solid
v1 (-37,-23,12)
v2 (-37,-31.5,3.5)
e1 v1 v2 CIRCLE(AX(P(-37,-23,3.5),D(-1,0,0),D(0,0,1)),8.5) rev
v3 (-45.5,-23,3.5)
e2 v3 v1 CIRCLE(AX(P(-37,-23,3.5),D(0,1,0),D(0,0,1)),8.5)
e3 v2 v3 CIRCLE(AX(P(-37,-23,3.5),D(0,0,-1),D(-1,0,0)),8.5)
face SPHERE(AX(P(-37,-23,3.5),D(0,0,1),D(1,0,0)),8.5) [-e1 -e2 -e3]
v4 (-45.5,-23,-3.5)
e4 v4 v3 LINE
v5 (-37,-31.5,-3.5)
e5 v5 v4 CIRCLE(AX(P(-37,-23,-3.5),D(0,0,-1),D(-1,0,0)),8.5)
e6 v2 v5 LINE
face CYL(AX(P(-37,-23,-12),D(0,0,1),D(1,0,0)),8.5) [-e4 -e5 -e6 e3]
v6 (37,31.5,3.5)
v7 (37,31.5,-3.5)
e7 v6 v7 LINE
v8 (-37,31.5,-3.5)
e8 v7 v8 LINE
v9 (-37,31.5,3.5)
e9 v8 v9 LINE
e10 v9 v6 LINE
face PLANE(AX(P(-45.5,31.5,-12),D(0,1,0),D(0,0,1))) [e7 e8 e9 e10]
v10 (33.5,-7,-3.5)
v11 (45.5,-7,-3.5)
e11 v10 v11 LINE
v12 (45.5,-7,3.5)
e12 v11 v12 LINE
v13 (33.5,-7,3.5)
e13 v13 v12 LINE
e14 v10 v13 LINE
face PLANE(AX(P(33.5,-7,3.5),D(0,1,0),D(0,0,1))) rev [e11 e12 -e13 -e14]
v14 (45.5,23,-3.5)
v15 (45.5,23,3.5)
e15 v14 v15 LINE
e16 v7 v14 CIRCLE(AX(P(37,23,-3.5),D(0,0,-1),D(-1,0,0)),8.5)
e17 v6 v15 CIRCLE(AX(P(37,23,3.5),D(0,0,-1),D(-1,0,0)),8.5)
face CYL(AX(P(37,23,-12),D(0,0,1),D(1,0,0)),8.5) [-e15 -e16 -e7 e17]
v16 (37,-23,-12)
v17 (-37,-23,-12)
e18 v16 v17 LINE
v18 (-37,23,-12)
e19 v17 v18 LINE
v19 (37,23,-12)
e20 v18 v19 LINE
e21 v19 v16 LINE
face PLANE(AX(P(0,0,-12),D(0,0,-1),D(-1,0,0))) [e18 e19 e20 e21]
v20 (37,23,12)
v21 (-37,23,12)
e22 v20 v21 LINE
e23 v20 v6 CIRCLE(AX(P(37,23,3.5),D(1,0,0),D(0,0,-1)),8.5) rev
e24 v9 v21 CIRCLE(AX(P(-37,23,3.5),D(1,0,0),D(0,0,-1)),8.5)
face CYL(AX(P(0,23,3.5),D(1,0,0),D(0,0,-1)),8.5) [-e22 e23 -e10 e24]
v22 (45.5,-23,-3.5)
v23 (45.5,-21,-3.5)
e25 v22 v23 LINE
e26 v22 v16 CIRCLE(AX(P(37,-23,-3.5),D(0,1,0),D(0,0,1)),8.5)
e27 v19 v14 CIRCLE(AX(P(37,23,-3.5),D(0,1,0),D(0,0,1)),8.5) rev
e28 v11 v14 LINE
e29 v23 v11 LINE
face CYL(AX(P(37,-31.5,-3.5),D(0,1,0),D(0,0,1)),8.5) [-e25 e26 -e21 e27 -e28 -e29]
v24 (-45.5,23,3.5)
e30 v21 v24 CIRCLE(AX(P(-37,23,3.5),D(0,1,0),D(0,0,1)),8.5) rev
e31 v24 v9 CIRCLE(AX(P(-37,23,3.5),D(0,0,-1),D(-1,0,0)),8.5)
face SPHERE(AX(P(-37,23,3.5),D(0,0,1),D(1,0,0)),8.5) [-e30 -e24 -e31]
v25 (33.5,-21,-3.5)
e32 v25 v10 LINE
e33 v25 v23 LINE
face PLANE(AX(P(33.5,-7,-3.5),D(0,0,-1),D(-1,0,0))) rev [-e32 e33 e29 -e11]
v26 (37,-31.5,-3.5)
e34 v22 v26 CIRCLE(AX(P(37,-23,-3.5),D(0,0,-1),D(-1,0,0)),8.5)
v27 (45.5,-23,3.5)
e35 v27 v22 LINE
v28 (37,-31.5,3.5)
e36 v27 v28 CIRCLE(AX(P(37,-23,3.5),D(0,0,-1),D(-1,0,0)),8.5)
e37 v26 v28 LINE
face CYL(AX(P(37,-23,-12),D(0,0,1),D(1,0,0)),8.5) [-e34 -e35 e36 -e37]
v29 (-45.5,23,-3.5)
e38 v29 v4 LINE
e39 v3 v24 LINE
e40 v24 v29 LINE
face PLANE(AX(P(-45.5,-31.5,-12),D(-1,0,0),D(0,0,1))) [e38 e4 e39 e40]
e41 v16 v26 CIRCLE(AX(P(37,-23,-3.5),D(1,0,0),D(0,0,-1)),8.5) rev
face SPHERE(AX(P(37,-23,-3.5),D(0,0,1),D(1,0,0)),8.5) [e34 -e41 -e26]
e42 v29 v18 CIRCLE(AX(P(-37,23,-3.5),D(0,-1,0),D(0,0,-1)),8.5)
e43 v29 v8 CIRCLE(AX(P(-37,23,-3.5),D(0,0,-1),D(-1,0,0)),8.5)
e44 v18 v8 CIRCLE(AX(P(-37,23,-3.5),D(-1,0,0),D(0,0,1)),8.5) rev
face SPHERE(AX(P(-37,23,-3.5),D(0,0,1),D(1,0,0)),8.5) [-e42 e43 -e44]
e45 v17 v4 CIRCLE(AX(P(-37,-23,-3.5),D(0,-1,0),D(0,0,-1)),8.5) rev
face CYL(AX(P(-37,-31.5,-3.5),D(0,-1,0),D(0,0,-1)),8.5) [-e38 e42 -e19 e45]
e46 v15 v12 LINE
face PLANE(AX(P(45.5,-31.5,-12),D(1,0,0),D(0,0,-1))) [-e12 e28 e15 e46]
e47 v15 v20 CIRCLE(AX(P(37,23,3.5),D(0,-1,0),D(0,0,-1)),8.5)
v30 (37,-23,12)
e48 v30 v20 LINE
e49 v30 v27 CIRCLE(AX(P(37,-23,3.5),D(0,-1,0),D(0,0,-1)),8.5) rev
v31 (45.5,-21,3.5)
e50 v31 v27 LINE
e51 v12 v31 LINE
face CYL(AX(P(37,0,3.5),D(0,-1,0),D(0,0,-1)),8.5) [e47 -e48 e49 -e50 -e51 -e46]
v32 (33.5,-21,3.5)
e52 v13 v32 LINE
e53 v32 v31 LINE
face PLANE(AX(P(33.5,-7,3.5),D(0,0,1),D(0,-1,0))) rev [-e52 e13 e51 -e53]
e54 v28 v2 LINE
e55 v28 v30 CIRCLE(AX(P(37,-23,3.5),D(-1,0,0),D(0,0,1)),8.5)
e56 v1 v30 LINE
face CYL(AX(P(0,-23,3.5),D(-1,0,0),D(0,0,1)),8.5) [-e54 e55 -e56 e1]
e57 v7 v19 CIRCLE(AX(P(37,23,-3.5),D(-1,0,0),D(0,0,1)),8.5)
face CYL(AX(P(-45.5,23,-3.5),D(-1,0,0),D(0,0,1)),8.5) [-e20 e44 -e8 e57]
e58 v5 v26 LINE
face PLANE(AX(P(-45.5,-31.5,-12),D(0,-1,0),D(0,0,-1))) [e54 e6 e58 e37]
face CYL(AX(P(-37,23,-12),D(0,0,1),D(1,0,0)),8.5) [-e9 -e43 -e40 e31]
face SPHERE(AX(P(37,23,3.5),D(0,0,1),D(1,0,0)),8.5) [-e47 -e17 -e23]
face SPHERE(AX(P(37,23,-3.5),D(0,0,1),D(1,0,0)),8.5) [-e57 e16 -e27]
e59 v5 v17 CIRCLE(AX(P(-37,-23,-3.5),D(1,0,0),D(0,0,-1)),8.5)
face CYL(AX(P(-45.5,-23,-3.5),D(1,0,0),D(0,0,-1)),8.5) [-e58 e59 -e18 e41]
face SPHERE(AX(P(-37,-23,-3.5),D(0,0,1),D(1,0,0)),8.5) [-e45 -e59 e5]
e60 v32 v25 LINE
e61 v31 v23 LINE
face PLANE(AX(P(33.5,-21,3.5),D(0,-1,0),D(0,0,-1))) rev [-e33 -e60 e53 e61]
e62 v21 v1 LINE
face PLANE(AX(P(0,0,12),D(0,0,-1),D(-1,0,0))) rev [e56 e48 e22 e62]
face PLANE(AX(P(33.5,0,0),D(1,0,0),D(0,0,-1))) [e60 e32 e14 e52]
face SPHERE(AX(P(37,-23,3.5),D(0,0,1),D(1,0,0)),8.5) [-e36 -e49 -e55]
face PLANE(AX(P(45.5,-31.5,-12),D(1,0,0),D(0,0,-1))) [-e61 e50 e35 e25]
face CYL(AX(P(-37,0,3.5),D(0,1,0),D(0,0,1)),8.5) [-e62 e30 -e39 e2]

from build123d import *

# Parameters (mm, degrees)
BOSS_EXTRUDE1_DEPTH      = 12
BOSS_EXTRUDE1_DEPTH_BACK = 12
SKETCH1_W                = 91
SKETCH1_H                = 63
FILLET1_R                = 8.5
FILLET2_R                = 8.5
SKETCH2_W                = 7
SKETCH2_H                = 14
CUT_EXTRUDE1_DEPTH       = 12


with BuildPart() as part:
    # Sketch1 → Boss-Extrude1 (new, two sides: drawn at the far end of the back side and taken through both)
    with BuildSketch(Plane.XY.offset(-BOSS_EXTRUDE1_DEPTH_BACK)):
        Rectangle(SKETCH1_W, SKETCH1_H)
    extrude(amount=BOSS_EXTRUDE1_DEPTH + BOSS_EXTRUDE1_DEPTH_BACK)

    # Fillet1
    fillet1_edges = [part.edges().sort_by_distance(p)[0] for p in [
        (45.5, 0, 12),
        (-45.5, 0, -12),
        (0, 31.5, 12),
        (-45.5, 0, 12),
        (0, -31.5, 12),
        (0, -31.5, -12),
        (45.5, 0, -12),
        (0, 31.5, -12),
    ]]
    fillet(fillet1_edges, radius=FILLET1_R)

    # Fillet2
    # the kernel refuses this fillet: 8.5 mm, written as the material it takes off along each edge
    with BuildSketch(Plane(origin=(37, -23, -3.5), x_dir=(1, 0, 0), z_dir=(0, -1, 0))) as fillet2_piece_1_section:
        Polygon((0, 0), (FILLET2_R, 0), (FILLET2_R, -FILLET2_R), (0, -FILLET2_R), align=None)
    fillet2_piece_1 = extrude(amount=FILLET2_R, mode=Mode.PRIVATE)
    fillet2_piece_1 = fillet2_piece_1 - Plane(origin=(37, -23, -3.5), x_dir=(-0.7071067811865475, 0, 0.7071067811865475), z_dir=(0, -1, 0)) * Sphere(FILLET2_R, mode=Mode.PRIVATE)
    add(fillet2_piece_1, mode=Mode.SUBTRACT)
    with BuildSketch(Plane(origin=(-37, -23, -3.5), x_dir=(-1, 0, 0), z_dir=(0, -1, 0))) as fillet2_piece_2_section:
        Polygon((0, 0), (FILLET2_R, 0), (FILLET2_R, FILLET2_R), (0, FILLET2_R), align=None)
    fillet2_piece_2 = extrude(amount=FILLET2_R, mode=Mode.PRIVATE)
    fillet2_piece_2 = fillet2_piece_2 - Plane(origin=(-37, -23, -3.5), x_dir=(0.7071067811865475, 0, 0.7071067811865475), z_dir=(0, -1, 0)) * Sphere(FILLET2_R, mode=Mode.PRIVATE)
    add(fillet2_piece_2, mode=Mode.SUBTRACT)
    with BuildSketch(Plane(origin=(37, 23, -3.5), x_dir=(0, 1, 0), z_dir=(1, 0, 0))) as fillet2_piece_3_section:
        Polygon((0, 0), (FILLET2_R, 0), (FILLET2_R, -FILLET2_R), (0, -FILLET2_R), align=None)
    fillet2_piece_3 = extrude(amount=FILLET2_R, mode=Mode.PRIVATE)
    fillet2_piece_3 = fillet2_piece_3 - Plane(origin=(37, 23, -3.5), x_dir=(0, -0.7071067811865475, 0.7071067811865475), z_dir=(1, 0, 0)) * Sphere(FILLET2_R, mode=Mode.PRIVATE)
    add(fillet2_piece_3, mode=Mode.SUBTRACT)
    with BuildSketch(Plane(origin=(-37, 23, -3.5), x_dir=(0, 1, 0), z_dir=(-1, 0, 0))) as fillet2_piece_4_section:
        Polygon((0, 0), (FILLET2_R, 0), (FILLET2_R, FILLET2_R), (0, FILLET2_R), align=None)
    fillet2_piece_4 = extrude(amount=FILLET2_R, mode=Mode.PRIVATE)
    fillet2_piece_4 = fillet2_piece_4 - Plane(origin=(-37, 23, -3.5), x_dir=(0, -0.7071067811865475, 0.7071067811865475), z_dir=(-1, 0, 0)) * Sphere(FILLET2_R, mode=Mode.PRIVATE)
    add(fillet2_piece_4, mode=Mode.SUBTRACT)
    with BuildSketch(Plane(origin=(-37, 23, 3.5), x_dir=(0, 1, 0), z_dir=(-1, 0, 0))) as fillet2_piece_5_section:
        Polygon((0, 0), (FILLET2_R, 0), (FILLET2_R, -FILLET2_R), (0, -FILLET2_R), align=None)
    fillet2_piece_5 = extrude(amount=FILLET2_R, mode=Mode.PRIVATE)
    fillet2_piece_5 = fillet2_piece_5 - Plane(origin=(-37, 23, 3.5), x_dir=(0, -0.7071067811865475, -0.7071067811865475), z_dir=(-1, 0, 0)) * Sphere(FILLET2_R, mode=Mode.PRIVATE)
    add(fillet2_piece_5, mode=Mode.SUBTRACT)
    with BuildSketch(Plane(origin=(37, 23, 3.5), x_dir=(0, 1, 0), z_dir=(1, 0, 0))) as fillet2_piece_6_section:
        Polygon((0, 0), (FILLET2_R, 0), (FILLET2_R, FILLET2_R), (0, FILLET2_R), align=None)
    fillet2_piece_6 = extrude(amount=FILLET2_R, mode=Mode.PRIVATE)
    fillet2_piece_6 = fillet2_piece_6 - Plane(origin=(37, 23, 3.5), x_dir=(0, -0.7071067811865475, -0.7071067811865475), z_dir=(1, 0, 0)) * Sphere(FILLET2_R, mode=Mode.PRIVATE)
    add(fillet2_piece_6, mode=Mode.SUBTRACT)
    with BuildSketch(Plane(origin=(-37, -23, 3.5), x_dir=(-1, 0, 0), z_dir=(0, -1, 0))) as fillet2_piece_7_section:
        Polygon((0, 0), (FILLET2_R, 0), (FILLET2_R, -FILLET2_R), (0, -FILLET2_R), align=None)
    fillet2_piece_7 = extrude(amount=FILLET2_R, mode=Mode.PRIVATE)
    fillet2_piece_7 = fillet2_piece_7 - Plane(origin=(-37, -23, 3.5), x_dir=(0.7071067811865475, 0, -0.7071067811865475), z_dir=(0, -1, 0)) * Sphere(FILLET2_R, mode=Mode.PRIVATE)
    add(fillet2_piece_7, mode=Mode.SUBTRACT)
    with BuildSketch(Plane(origin=(37, -23, 3.5), x_dir=(1, 0, 0), z_dir=(0, -1, 0))) as fillet2_piece_8_section:
        Polygon((0, 0), (FILLET2_R, 0), (FILLET2_R, FILLET2_R), (0, FILLET2_R), align=None)
    fillet2_piece_8 = extrude(amount=FILLET2_R, mode=Mode.PRIVATE)
    fillet2_piece_8 = fillet2_piece_8 - Plane(origin=(37, -23, 3.5), x_dir=(-0.7071067811865475, 0, -0.7071067811865475), z_dir=(0, -1, 0)) * Sphere(FILLET2_R, mode=Mode.PRIVATE)
    add(fillet2_piece_8, mode=Mode.SUBTRACT)
    with BuildSketch(Plane(origin=(-45.5, 31.5, 3.5), x_dir=(0, -1, 0), z_dir=(0, 0, -1)), Plane(origin=(45.5, 31.5, -3.5), x_dir=(0, -1, 0), z_dir=(0, 0, 1)), Plane(origin=(-45.5, -31.5, 3.5), x_dir=(1, 0, 0), z_dir=(0, 0, -1)), Plane(origin=(45.5, -31.5, -3.5), x_dir=(-1, 0, 0), z_dir=(0, 0, 1))) as fillet2_piece_9:
        with BuildLine():
            CenterArc((FILLET2_R, -FILLET2_R), FILLET2_R, 90, 90)
            Line((0, -FILLET2_R), (0, 0))
            Line((0, 0), (FILLET2_R, 0))
        make_face()
    extrude(amount=7, mode=Mode.SUBTRACT)

    # Sketch2 → Cut-Extrude1 (cut)
    with BuildSketch(Plane(origin=(45.5, 0, 0), x_dir=(0, 0, -1), z_dir=(1, 0, 0))):
        with Locations((0, -14)):
            Rectangle(SKETCH2_W, SKETCH2_H)
    extrude(amount=-CUT_EXTRUDE1_DEPTH, mode=Mode.SUBTRACT)


solid = part.part
